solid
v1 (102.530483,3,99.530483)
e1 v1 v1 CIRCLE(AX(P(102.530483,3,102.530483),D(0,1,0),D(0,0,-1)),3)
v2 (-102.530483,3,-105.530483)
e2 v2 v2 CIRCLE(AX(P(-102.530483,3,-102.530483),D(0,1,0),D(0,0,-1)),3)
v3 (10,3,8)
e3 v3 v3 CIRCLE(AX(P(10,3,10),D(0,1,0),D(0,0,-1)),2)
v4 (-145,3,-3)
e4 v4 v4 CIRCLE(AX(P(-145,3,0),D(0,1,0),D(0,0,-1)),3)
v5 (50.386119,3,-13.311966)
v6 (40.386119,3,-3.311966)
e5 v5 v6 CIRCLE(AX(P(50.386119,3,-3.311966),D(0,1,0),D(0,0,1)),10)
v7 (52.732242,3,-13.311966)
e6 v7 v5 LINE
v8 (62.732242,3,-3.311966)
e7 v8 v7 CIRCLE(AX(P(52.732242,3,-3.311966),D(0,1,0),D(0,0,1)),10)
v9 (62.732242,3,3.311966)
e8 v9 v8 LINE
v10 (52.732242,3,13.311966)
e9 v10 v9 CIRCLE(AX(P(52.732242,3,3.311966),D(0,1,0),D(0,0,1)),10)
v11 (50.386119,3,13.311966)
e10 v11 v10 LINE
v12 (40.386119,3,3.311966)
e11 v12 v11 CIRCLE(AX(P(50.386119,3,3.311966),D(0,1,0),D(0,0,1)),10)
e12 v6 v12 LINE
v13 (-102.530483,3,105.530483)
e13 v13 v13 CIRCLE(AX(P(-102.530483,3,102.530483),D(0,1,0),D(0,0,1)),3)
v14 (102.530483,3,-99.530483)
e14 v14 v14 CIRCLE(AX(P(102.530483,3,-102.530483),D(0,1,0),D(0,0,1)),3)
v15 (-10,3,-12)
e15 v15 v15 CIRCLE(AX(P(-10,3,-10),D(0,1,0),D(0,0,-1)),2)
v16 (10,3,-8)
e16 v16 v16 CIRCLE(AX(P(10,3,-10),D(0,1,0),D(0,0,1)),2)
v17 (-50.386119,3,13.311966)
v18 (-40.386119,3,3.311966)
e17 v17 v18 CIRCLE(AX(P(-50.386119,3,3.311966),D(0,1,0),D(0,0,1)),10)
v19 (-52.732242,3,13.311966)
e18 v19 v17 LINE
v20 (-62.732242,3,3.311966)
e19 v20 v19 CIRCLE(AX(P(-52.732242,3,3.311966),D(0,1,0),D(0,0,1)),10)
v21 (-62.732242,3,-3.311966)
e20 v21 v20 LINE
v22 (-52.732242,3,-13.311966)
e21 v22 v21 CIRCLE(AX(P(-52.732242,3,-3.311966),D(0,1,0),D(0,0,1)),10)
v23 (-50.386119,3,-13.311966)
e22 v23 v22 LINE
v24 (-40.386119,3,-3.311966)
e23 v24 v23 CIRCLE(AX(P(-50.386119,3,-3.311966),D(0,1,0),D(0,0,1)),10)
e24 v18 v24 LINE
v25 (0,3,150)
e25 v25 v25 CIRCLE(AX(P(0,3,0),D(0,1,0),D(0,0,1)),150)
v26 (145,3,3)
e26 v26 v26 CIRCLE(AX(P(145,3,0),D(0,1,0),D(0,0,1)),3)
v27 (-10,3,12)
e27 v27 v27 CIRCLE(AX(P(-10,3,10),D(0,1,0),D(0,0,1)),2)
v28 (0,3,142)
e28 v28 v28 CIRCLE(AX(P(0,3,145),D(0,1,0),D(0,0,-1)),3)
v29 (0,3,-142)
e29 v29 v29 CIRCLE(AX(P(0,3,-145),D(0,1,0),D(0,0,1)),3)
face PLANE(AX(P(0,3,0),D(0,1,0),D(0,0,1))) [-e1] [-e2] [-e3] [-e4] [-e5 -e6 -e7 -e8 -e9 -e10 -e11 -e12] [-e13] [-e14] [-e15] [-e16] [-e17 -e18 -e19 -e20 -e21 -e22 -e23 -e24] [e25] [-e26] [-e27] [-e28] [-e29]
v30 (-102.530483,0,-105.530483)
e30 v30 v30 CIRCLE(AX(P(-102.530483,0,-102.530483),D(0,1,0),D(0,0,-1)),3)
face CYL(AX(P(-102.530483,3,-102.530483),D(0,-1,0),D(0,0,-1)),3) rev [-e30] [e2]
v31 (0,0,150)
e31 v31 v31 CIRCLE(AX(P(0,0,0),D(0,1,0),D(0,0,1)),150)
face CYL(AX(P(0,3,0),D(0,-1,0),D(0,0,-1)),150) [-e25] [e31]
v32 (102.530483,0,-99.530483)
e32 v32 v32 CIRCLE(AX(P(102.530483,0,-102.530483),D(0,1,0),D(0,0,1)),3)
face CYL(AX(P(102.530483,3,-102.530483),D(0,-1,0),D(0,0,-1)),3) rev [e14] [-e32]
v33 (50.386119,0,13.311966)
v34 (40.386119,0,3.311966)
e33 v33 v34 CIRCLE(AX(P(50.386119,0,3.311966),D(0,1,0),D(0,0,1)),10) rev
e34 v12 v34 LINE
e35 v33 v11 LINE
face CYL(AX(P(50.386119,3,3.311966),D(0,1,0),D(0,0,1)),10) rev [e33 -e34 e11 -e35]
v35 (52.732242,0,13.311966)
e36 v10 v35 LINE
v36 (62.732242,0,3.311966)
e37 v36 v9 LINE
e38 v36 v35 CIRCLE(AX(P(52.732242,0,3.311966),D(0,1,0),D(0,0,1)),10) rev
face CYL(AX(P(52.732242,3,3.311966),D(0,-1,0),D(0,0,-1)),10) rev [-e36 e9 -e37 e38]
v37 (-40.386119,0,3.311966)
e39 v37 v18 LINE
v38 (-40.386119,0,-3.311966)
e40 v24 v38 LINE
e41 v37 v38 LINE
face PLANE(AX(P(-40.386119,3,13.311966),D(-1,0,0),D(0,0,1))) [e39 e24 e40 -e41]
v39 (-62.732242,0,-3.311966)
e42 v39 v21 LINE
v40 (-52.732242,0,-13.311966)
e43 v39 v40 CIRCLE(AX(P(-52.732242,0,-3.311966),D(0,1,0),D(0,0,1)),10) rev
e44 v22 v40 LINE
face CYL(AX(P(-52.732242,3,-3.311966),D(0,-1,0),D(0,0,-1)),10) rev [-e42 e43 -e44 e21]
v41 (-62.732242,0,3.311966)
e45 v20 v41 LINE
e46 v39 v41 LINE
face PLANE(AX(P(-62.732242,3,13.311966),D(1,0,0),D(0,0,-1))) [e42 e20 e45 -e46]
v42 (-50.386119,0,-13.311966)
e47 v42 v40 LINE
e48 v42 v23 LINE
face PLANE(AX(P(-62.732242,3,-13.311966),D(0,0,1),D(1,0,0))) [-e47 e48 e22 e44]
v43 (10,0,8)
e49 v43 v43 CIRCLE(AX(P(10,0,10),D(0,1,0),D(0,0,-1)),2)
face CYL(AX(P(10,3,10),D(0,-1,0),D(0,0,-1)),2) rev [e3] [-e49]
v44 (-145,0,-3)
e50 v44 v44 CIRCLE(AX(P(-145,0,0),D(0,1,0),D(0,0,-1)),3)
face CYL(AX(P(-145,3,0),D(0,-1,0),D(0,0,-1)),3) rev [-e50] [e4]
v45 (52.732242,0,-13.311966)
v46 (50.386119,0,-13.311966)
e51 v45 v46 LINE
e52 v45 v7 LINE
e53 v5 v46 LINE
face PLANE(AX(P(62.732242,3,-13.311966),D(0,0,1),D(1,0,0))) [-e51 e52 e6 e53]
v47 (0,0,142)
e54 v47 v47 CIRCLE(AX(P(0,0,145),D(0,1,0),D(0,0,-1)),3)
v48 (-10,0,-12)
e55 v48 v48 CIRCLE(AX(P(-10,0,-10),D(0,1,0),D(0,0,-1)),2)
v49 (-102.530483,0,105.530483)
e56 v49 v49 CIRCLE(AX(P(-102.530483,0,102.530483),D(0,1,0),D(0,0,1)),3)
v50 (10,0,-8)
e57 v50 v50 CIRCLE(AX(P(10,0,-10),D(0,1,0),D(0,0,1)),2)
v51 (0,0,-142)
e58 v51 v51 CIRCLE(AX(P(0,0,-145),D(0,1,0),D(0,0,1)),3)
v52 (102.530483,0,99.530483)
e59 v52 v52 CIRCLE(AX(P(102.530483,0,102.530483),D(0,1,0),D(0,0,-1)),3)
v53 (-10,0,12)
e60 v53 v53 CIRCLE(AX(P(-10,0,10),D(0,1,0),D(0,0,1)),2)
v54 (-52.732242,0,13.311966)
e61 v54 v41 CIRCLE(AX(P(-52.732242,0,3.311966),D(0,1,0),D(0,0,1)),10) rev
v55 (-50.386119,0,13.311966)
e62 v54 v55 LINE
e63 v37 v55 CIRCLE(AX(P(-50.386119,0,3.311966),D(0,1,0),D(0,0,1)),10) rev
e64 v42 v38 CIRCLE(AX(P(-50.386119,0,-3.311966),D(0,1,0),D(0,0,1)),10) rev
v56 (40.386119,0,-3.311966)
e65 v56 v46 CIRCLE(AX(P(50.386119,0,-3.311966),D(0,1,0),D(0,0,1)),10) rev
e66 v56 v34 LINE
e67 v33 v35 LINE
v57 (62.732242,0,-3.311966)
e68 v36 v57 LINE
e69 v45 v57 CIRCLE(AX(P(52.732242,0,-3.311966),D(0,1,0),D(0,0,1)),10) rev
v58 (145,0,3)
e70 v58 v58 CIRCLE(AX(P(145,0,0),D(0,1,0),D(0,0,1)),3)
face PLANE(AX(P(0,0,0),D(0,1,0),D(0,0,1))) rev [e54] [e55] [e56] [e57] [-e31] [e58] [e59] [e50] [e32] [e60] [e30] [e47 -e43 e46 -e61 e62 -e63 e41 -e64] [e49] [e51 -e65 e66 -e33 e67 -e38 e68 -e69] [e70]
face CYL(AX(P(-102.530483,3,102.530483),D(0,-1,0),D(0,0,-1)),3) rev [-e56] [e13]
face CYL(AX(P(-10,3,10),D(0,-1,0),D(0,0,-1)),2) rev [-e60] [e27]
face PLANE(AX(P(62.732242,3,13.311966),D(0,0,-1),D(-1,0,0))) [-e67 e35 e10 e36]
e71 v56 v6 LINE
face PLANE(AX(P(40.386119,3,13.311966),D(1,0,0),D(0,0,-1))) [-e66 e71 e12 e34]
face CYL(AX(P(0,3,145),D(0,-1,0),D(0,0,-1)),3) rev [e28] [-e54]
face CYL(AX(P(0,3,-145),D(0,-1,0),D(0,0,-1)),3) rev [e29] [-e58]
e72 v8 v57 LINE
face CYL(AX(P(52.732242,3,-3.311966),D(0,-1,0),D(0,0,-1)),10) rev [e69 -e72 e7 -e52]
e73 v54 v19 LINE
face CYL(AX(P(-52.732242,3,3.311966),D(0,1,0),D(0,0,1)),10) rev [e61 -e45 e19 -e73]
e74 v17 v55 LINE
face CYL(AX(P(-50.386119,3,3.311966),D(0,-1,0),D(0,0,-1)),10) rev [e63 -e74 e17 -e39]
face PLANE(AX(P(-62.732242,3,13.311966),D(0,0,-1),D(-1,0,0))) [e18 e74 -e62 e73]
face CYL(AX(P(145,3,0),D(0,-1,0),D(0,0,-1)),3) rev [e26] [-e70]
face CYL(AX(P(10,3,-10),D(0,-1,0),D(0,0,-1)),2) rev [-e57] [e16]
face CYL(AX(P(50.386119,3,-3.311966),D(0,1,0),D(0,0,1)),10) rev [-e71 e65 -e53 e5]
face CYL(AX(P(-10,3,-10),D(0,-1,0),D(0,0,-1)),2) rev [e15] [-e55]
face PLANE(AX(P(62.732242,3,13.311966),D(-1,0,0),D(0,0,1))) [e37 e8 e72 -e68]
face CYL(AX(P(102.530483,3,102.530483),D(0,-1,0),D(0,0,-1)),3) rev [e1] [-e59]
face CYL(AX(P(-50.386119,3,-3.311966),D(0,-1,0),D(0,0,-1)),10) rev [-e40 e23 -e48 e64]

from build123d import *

# Parameters (mm, degrees)
EXTRUDE_1_OUTLINE_R   = 150
EXTRUDE_1_OUTLINE_R_2 = 3
EXTRUDE_1_OUTLINE_R_3 = 2
EXTRUDE_1_OUTLINE_W   = 22.346122356
EXTRUDE_1_OUTLINE_H   = 26.623931282
EXTRUDE_1_DEPTH       = 3
FILLET_1_R            = 10
FILLET_2_R            = 10
FILLET_3_R            = 10
FILLET_4_R            = 10
FILLET_5_R            = 10
FILLET_6_R            = 10
FILLET_7_R            = 10
FILLET_8_R            = 10


# Read off the part's stored shape, not the designer's step: Бобышка-Вытянуть1
with BuildPart() as part:
    # Бобышка-Вытянуть1 outline → Бобышка-Вытянуть1 (new body)
    with BuildSketch(Plane(origin=(0, 0, 0), x_dir=(1, 0, 0), z_dir=(0, 1, 0))):
        Circle(EXTRUDE_1_OUTLINE_R)
        with Locations((-102.530483272, -102.530483272)):
            Circle(EXTRUDE_1_OUTLINE_R_2, mode=Mode.SUBTRACT)
        with Locations((-10, -10)):
            Circle(EXTRUDE_1_OUTLINE_R_3, mode=Mode.SUBTRACT)
        with Locations((0, -145)):
            Circle(EXTRUDE_1_OUTLINE_R_2, mode=Mode.SUBTRACT)
        with Locations((102.530483272, -102.530483272)):
            Circle(EXTRUDE_1_OUTLINE_R_2, mode=Mode.SUBTRACT)
        with Locations((10, -10)):
            Circle(EXTRUDE_1_OUTLINE_R_3, mode=Mode.SUBTRACT)
        with Locations((-145, 0)):
            Circle(EXTRUDE_1_OUTLINE_R_2, mode=Mode.SUBTRACT)
        with Locations((-51.559180368, 0)):
            Rectangle(EXTRUDE_1_OUTLINE_W, EXTRUDE_1_OUTLINE_H, mode=Mode.SUBTRACT)
        with Locations((-10, 10)):
            Circle(EXTRUDE_1_OUTLINE_R_3, mode=Mode.SUBTRACT)
        with Locations((-102.530483272, 102.530483272)):
            Circle(EXTRUDE_1_OUTLINE_R_2, mode=Mode.SUBTRACT)
        with Locations((10, 10)):
            Circle(EXTRUDE_1_OUTLINE_R_3, mode=Mode.SUBTRACT)
        with Locations((51.559180368, 0)):
            Rectangle(EXTRUDE_1_OUTLINE_W, EXTRUDE_1_OUTLINE_H, mode=Mode.SUBTRACT)
        with Locations((145, 0)):
            Circle(EXTRUDE_1_OUTLINE_R_2, mode=Mode.SUBTRACT)
        with Locations((0, 145)):
            Circle(EXTRUDE_1_OUTLINE_R_2, mode=Mode.SUBTRACT)
        with Locations((102.530483272, 102.530483272)):
            Circle(EXTRUDE_1_OUTLINE_R_2, mode=Mode.SUBTRACT)
    extrude(amount=EXTRUDE_1_DEPTH)

    # Скругление1
    fillet_1_edges = [part.edges().sort_by_distance(p)[0] for p in [
        (-62.732241546, 1.5, -13.311965641),
    ]]
    fillet(fillet_1_edges, radius=FILLET_1_R)

    # Скругление2
    fillet_2_edges = [part.edges().sort_by_distance(p)[0] for p in [
        (-40.38611919, 1.5, 13.311965641),
    ]]
    fillet(fillet_2_edges, radius=FILLET_2_R)

    # Скругление3
    fillet_3_edges = [part.edges().sort_by_distance(p)[0] for p in [
        (40.38611919, 1.5, 13.311965641),
    ]]
    fillet(fillet_3_edges, radius=FILLET_3_R)

    # Скругление4
    fillet_4_edges = [part.edges().sort_by_distance(p)[0] for p in [
        (62.732241546, 1.5, -13.311965641),
    ]]
    fillet(fillet_4_edges, radius=FILLET_4_R)

    # Скругление5
    fillet_5_edges = [part.edges().sort_by_distance(p)[0] for p in [
        (-40.38611919, 1.5, -13.311965641),
    ]]
    fillet(fillet_5_edges, radius=FILLET_5_R)

    # Скругление6
    fillet_6_edges = [part.edges().sort_by_distance(p)[0] for p in [
        (-62.732241546, 1.5, 13.311965641),
    ]]
    fillet(fillet_6_edges, radius=FILLET_6_R)

    # Скругление7
    fillet_7_edges = [part.edges().sort_by_distance(p)[0] for p in [
        (62.732241546, 1.5, 13.311965641),
    ]]
    fillet(fillet_7_edges, radius=FILLET_7_R)

    # Скругление8
    fillet_8_edges = [part.edges().sort_by_distance(p)[0] for p in [
        (40.38611919, 1.5, -13.311965641),
    ]]
    fillet(fillet_8_edges, radius=FILLET_8_R)


solid = part.part
